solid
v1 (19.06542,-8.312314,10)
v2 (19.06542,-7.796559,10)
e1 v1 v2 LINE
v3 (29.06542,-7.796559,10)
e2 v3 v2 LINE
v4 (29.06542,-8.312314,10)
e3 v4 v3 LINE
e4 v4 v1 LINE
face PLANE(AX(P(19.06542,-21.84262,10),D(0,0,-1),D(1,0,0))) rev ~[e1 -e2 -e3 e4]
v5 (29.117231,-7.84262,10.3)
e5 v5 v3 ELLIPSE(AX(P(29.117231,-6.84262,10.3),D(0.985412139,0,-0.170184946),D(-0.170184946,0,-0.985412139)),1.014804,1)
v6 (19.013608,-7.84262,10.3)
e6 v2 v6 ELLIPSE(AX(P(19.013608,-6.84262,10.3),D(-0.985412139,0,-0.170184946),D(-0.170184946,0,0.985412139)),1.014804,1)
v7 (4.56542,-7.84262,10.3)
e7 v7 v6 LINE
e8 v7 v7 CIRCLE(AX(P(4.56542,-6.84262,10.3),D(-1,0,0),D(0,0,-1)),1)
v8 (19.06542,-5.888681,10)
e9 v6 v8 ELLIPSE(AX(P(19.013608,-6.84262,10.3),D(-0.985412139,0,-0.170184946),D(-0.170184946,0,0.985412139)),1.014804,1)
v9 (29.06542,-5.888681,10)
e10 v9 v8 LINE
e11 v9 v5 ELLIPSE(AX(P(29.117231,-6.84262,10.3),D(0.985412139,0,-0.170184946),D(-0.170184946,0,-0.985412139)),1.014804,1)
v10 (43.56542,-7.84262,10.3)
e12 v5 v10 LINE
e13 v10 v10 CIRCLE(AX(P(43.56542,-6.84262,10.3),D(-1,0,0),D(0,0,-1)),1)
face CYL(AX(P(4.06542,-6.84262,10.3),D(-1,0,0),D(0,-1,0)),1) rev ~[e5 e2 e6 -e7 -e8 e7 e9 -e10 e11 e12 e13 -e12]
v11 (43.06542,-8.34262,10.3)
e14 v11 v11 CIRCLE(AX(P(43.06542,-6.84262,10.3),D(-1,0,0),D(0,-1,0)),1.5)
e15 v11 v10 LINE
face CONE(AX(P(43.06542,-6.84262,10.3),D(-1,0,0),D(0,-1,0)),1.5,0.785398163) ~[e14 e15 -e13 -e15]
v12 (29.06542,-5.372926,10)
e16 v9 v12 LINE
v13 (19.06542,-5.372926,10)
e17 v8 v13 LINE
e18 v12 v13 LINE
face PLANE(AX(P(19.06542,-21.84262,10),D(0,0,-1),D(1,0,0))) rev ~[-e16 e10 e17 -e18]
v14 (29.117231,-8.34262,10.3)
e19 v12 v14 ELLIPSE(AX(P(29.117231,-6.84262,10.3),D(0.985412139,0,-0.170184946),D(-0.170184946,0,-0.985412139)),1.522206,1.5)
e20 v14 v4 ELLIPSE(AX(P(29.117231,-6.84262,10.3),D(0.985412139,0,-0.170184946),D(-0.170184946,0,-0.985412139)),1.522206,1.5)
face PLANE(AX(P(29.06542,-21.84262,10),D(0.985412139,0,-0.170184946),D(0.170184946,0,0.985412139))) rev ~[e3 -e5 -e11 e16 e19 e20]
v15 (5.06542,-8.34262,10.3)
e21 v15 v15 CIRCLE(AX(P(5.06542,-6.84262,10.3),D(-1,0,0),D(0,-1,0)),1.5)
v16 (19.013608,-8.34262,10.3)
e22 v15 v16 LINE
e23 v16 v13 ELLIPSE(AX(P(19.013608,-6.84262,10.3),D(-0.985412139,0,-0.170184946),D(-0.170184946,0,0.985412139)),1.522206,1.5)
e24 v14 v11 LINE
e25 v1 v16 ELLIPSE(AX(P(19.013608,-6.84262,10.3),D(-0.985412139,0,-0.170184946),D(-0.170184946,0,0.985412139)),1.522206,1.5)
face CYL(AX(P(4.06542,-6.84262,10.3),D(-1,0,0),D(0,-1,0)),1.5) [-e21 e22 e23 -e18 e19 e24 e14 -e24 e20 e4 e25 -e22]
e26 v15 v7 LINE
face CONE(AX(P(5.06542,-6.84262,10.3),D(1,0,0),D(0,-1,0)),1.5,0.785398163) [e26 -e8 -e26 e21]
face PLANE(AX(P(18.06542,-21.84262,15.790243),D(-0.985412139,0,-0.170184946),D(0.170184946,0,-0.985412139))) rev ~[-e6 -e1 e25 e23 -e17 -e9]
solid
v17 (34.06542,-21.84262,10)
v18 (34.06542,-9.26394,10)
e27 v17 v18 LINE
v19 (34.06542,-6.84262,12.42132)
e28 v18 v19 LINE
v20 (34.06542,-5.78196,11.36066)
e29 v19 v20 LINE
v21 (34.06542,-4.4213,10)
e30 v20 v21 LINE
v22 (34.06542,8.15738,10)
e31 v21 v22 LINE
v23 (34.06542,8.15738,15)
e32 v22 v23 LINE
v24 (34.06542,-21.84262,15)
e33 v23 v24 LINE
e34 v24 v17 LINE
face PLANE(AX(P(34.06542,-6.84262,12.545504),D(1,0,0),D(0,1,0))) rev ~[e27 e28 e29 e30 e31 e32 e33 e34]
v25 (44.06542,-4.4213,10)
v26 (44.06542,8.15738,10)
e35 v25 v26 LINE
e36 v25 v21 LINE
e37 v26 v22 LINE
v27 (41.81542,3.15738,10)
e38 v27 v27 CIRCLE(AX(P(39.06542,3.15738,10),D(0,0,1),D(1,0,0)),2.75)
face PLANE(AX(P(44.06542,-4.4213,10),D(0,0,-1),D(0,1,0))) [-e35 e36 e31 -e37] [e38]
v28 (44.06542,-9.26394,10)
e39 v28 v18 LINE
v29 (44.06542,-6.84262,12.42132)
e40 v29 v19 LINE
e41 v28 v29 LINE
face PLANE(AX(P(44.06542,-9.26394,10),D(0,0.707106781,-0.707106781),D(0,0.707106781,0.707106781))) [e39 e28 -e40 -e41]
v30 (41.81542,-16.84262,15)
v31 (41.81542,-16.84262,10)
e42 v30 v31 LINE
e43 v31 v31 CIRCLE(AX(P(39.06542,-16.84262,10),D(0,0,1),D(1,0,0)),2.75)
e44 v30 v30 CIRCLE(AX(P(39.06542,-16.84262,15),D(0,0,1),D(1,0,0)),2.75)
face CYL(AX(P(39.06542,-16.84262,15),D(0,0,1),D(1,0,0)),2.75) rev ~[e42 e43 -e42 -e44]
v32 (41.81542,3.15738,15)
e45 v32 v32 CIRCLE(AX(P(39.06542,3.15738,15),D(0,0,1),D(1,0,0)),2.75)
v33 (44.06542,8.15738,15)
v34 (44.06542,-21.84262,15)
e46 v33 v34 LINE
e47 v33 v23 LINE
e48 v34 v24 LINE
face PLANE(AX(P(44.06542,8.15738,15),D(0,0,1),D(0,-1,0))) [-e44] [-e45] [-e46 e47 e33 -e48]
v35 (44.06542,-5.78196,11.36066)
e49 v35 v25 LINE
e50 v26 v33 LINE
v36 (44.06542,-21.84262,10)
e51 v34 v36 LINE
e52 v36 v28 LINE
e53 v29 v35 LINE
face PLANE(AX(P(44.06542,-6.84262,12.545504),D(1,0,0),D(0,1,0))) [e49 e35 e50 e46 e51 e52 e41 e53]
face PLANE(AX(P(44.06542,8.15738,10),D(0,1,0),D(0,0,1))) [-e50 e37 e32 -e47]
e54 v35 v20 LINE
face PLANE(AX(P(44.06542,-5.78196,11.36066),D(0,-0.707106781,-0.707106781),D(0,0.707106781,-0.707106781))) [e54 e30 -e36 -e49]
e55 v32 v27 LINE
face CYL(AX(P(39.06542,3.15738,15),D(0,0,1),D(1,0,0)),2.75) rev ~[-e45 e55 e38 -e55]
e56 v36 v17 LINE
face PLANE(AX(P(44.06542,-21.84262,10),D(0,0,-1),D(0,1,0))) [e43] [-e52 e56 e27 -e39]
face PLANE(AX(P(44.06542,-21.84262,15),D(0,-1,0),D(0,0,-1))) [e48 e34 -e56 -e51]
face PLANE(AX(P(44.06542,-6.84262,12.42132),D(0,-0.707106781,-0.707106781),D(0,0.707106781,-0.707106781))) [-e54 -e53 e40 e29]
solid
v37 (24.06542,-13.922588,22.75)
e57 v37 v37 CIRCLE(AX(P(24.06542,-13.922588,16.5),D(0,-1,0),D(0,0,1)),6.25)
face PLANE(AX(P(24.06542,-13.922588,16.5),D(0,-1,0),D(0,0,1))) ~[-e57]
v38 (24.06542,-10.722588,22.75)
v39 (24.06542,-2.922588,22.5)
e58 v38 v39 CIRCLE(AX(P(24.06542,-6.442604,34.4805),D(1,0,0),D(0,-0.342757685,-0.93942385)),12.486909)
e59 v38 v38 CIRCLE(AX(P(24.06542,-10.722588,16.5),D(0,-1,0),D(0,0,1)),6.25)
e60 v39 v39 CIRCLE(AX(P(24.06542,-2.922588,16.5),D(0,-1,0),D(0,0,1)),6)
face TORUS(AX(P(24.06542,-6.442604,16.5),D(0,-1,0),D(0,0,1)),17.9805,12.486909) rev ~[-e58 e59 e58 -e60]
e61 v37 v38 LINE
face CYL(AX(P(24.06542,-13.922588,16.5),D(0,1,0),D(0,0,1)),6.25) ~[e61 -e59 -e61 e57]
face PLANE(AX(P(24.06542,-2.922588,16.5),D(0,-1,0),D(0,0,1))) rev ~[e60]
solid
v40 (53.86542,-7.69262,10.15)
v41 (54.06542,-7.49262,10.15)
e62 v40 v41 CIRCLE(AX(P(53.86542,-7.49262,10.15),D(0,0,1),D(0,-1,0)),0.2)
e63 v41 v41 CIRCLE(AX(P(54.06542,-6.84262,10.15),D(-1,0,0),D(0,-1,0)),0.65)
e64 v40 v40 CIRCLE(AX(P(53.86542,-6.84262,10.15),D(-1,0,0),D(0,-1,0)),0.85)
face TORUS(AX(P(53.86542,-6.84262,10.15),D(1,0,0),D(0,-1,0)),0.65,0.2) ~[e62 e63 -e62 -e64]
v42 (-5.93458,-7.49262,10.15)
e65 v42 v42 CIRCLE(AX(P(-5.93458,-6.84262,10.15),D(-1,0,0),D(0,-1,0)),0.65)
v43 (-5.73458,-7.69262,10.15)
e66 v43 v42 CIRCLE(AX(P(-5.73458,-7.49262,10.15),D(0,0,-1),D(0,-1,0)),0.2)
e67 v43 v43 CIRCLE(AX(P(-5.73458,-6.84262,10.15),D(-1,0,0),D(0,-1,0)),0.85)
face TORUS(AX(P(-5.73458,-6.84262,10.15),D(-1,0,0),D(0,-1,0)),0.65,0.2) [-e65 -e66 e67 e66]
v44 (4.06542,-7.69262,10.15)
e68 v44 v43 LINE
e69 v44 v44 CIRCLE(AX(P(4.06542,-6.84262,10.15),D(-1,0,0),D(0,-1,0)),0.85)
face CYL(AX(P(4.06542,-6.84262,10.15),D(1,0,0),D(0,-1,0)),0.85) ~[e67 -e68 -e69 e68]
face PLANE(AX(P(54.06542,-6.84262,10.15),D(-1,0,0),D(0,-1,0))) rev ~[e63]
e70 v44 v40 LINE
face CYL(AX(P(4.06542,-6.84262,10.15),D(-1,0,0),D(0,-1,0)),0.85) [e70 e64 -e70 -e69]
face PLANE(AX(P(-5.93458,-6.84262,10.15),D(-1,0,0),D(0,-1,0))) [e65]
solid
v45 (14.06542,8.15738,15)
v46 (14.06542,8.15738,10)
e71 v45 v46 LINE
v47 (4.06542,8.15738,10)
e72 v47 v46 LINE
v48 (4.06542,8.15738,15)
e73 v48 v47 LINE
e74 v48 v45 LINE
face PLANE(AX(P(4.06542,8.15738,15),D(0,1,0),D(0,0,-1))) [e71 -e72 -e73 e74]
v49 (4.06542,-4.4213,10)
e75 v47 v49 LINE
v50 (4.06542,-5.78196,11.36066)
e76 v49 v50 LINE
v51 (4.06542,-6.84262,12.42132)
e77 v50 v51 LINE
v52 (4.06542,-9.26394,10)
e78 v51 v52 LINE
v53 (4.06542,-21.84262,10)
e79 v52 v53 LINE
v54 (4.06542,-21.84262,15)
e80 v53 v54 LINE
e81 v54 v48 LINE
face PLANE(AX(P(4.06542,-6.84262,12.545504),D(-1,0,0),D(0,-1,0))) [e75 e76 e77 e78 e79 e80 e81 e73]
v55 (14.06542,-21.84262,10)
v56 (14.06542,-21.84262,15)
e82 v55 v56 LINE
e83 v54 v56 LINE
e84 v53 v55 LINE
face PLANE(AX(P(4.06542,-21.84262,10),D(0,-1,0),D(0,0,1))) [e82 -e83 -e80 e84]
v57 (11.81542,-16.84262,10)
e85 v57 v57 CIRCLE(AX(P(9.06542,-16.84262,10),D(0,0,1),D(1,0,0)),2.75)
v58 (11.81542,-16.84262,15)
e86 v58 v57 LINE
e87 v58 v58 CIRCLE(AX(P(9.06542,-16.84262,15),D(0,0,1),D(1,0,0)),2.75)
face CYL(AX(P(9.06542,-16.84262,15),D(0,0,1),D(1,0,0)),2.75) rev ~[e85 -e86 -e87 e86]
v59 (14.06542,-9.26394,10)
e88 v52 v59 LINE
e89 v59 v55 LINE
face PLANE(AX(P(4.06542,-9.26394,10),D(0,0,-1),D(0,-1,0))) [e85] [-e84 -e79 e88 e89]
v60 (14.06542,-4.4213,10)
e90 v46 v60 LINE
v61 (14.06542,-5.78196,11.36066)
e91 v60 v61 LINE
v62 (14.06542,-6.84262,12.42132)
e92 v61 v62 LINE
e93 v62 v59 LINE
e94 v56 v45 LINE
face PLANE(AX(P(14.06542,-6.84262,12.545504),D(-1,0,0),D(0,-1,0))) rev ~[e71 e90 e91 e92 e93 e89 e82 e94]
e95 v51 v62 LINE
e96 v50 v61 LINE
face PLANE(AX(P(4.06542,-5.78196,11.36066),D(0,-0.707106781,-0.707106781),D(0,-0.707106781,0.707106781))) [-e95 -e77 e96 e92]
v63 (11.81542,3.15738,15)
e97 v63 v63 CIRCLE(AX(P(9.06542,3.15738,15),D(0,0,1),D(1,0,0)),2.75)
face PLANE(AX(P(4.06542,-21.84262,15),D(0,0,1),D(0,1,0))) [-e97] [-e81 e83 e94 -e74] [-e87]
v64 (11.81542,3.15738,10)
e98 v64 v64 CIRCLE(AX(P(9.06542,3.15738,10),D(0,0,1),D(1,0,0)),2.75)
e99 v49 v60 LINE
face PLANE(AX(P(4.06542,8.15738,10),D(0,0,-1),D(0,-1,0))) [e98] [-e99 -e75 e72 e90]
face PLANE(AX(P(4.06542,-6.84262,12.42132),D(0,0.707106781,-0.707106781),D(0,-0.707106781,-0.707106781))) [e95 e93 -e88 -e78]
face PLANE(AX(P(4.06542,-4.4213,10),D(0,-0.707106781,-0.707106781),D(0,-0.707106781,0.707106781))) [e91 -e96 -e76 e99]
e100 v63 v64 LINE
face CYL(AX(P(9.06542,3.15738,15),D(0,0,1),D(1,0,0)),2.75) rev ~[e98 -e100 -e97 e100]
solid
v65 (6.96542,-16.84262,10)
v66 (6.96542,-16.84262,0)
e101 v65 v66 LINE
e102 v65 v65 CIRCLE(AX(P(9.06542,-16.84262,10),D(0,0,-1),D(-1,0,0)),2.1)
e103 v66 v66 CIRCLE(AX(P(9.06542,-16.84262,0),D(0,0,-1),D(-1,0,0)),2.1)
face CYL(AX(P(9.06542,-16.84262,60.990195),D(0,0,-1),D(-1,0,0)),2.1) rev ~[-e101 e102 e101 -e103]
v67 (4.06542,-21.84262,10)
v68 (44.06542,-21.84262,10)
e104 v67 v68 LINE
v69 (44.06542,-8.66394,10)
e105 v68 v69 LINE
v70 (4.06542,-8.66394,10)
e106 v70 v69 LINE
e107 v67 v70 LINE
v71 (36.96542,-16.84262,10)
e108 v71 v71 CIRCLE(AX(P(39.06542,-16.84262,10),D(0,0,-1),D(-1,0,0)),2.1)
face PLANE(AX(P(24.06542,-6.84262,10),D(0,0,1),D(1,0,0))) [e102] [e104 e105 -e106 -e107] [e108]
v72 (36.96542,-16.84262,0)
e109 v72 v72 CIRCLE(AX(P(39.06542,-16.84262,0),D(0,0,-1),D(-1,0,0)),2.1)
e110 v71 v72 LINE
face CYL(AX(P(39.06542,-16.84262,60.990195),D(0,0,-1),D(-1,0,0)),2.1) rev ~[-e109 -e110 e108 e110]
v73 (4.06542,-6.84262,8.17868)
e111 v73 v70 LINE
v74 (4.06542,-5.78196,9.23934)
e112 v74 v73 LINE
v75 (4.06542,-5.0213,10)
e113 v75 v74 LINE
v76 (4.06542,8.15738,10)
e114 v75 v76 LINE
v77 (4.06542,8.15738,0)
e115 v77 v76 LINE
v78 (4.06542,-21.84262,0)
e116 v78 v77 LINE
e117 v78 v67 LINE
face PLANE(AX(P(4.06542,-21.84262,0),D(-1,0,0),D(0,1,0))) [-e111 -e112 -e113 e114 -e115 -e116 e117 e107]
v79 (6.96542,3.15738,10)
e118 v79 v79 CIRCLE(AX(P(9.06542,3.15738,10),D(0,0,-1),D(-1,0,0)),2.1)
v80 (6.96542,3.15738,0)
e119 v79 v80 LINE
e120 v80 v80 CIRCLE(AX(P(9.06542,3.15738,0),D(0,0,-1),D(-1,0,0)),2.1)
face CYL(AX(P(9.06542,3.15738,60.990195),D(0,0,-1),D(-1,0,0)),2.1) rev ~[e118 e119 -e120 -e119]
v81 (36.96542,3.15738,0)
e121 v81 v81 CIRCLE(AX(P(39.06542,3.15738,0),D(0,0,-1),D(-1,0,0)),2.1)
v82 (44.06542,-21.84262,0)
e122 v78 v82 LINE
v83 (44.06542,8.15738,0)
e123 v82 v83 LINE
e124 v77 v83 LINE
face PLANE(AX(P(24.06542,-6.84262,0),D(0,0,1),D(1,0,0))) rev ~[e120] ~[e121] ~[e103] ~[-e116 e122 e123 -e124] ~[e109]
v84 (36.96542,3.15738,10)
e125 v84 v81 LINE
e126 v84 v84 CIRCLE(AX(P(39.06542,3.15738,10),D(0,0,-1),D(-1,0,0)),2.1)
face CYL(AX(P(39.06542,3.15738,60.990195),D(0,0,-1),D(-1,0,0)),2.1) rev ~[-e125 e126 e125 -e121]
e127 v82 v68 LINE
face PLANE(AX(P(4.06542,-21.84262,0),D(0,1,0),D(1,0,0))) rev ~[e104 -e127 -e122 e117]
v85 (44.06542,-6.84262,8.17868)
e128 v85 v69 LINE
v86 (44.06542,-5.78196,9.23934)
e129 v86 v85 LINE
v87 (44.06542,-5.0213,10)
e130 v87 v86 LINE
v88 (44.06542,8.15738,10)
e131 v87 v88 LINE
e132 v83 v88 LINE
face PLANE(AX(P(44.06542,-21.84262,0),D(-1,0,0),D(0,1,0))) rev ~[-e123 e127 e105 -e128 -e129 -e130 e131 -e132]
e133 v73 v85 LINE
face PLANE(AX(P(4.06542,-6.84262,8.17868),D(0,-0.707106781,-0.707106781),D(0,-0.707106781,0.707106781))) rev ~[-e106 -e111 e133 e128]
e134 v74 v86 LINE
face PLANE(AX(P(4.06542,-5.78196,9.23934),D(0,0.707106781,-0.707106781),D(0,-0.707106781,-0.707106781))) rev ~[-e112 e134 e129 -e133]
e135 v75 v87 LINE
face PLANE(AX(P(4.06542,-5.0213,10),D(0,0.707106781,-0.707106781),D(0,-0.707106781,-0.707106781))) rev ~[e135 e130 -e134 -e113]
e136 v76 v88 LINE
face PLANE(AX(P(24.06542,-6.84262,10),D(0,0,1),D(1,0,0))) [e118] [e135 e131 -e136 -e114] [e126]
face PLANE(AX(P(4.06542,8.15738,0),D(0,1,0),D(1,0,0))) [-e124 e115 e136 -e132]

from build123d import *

# Parameters (mm, degrees)
F0_W      = 40
F0_H      = 30
F1_DEPTH  = 10
F4_DEPTH  = 40
F5_D      = 4.2
F7_DEPTH  = 10
F9_DEPTH  = 10
F10_R     = 2.75
F11_DEPTH = 5
F12_R     = 2.75
F13_DEPTH = 5
F15_R     = 1.5
F15_R_2   = 1
F16_DEPTH = 40
F17_W     = 10
F17_H     = 5.7902427018
F18_DEPTH = 25
F20_R     = 0.85
F21_DEPTH = 50
F22_DEPTH = 10
F26_R     = 0.2


# Not quite as in the source:
# - a fillet or chamfer that OpenCascade refuses, or shapes differently, is made with other operations: its cross-section is extruded or revolved along the edge and cut away or added


with BuildPart() as f1:
    # F0 (on Top) → F1 (new body)
    with BuildSketch(Plane.XY):
        with Locations((24.0654195845, -6.8426200747)):
            Rectangle(F0_W, F0_H)
    extrude(amount=F1_DEPTH)

    # F3 (on face) → F4 (cut, through all)
    with BuildSketch(Plane(origin=(4.0654195845, 0, 0), x_dir=(0, -1, 0), z_dir=(-1, 0, 0))):
        with BuildLine():
            ThreePointArc((7.9032802465, 9.2393398282), (6.8426200747, 8.8), (5.781959903, 9.2393398282))
            Line((5.781959903, 9.2393398282), (6.8426200747, 8.1786796564))
            Line((6.8426200747, 8.1786796564), (7.9032802465, 9.2393398282))
        make_face()
        with BuildLine():
            ThreePointArc((5.3729262291, 10), (5.5215130247, 9.5895943677), (5.781959903, 9.2393398282))
            ThreePointArc((5.781959903, 9.2393398282), (6.8426200747, 8.8), (7.9032802465, 9.2393398282))
            ThreePointArc((7.9032802465, 9.2393398282), (8.1637271248, 9.5895943677), (8.3123139204, 10))
            Line((8.3123139204, 10), (6.8426200747, 10))
            Line((6.8426200747, 10), (5.3729262291, 10))
        make_face()
        with BuildLine():
            Line((5.3729262291, 10), (5.0212997312, 10))
            Line((5.0212997312, 10), (5.781959903, 9.2393398282))
            ThreePointArc((5.781959903, 9.2393398282), (5.5215130247, 9.5895943677), (5.3729262291, 10))
        make_face()
        with BuildLine():
            ThreePointArc((8.3123139204, 10), (8.1637271248, 9.5895943677), (7.9032802465, 9.2393398282))
            Line((7.9032802465, 9.2393398282), (8.6639404183, 10))
            Line((8.6639404183, 10), (8.3123139204, 10))
        make_face()
    extrude(amount=-F4_DEPTH, mode=Mode.SUBTRACT)

    # F5 (through all)
    with Locations(Plane.XY.offset(10)):
        with Locations((9.0654195845, 3.1573799253), (39.0654195845, 3.1573799253), (39.0654195845, -16.8426200747), (9.0654195845, -16.8426200747)):
            Hole(F5_D / 2)


with BuildPart() as f7:
    # F6 (on face) → F7 (new body)
    with BuildSketch(Plane(origin=(4.0654195845, 0, 0), x_dir=(0, -1, 0), z_dir=(-1, 0, 0))):
        Polygon((-8.1573799253, 15), (-8.1573799253, 10), (4.4212997312, 10), (5.781959903, 11.3606601718), (6.8426200747, 12.4213203436), (7.9032802476, 11.3606601707), (9.2639404183, 10), (21.8426200747, 10), (21.8426200747, 15), align=None)
    extrude(amount=-F7_DEPTH)

    # F10 (on face) → F11 (cut, through all)
    with BuildSketch(Plane.XY.offset(15)):
        with Locations((9.0654195845, 3.1573799253)):
            Circle(F10_R)
        with Locations((9.0654195845, -16.8426200747)):
            Circle(F10_R)
    extrude(amount=-F11_DEPTH, mode=Mode.SUBTRACT)


with BuildPart() as f9:
    # F8 (on face) → F9 (new body)
    with BuildSketch(Plane.YZ.offset(44.0654195845)):
        Polygon((-6.8426200747, 12.4213203436), (-5.781959903, 11.3606601718), (-4.4212997312, 10), (8.1573799253, 10), (8.1573799253, 15), (-21.8426200747, 15), (-21.8426200747, 10), (-9.2639404183, 10), (-7.9032802476, 11.3606601707), align=None)
    extrude(amount=-F9_DEPTH)

    # F12 (on face) → F13 (cut, through all)
    with BuildSketch(Plane.XY.offset(15)):
        with Locations((39.0654195845, 3.1573799253)):
            Circle(F12_R)
        with Locations((39.0654195845, -16.8426200747)):
            Circle(F12_R)
    extrude(amount=-F13_DEPTH, mode=Mode.SUBTRACT)


with BuildPart() as f16:
    # F15 (on offset) → F16 (new body)
    with BuildSketch(Plane(origin=(4.0654195845, 0, 0), x_dir=(0, -1, 0), z_dir=(-1, 0, 0))):
        with Locations((6.8426200747, 10.3)):
            Circle(F15_R)
        with Locations((6.8426200747, 10.3)):
            Circle(F15_R_2, mode=Mode.SUBTRACT)
    extrude(amount=-F16_DEPTH)

    # F17 (on face) → F18 (cut)
    with BuildSketch(Plane.XZ.offset(21.8426200747)):
        with Locations((24.0654195845, 12.8951213509)):
            Rectangle(F17_W, F17_H)
        Polygon((19.0654195845, 10), (19.0654195845, 15.7902427018), (18.0654195845, 15.7902427018), align=None)
        Polygon((30.0654195845, 15.7902427018), (29.0654195845, 15.7902427018), (29.0654195845, 10), align=None)
    extrude(amount=-F18_DEPTH, mode=Mode.SUBTRACT)

    # F19: chamfer of 1 on 2 edges, made by hand

    # F19_s1 → F19_t2 (revolve, cut)
    with BuildSketch(Plane.XY.offset(10.3)):
        Polygon((5.0654195845, -8.3426200747), (4.0654195845, -7.3426200747), (4.0654195845, -8.3426200747), align=None)
    revolve(axis=Axis((4.0654195845, -6.8426200747, 10.3), (-1, 0, 0)), mode=Mode.SUBTRACT)

    # F19_s3 → F19_t4 (revolve, cut)
    with BuildSketch(Plane.XY.offset(10.3)):
        Polygon((43.0654195845, -8.3426200747), (44.0654195845, -7.3426200747), (44.0654195845, -8.3426200747), align=None)
    revolve(axis=Axis((44.0654195845, -6.8426200747, 10.3), (-1, 0, 0)), mode=Mode.SUBTRACT)


with BuildPart() as f21:
    # F20 (on offset) → F21 (new body)
    with BuildSketch(Plane(origin=(4.0654195845, 0, 0), x_dir=(0, -1, 0), z_dir=(-1, 0, 0))):
        with Locations((6.8426200747, 10.15)):
            Circle(F20_R)
    extrude(amount=-F21_DEPTH)

    # F22 (add): a face of the model
    f22_faces = [f21.faces().sort_by_distance(p)[0] for p in [
        (4.0654195845, -6.8426200747, 10.15),
    ]]
    extrude(f22_faces, amount=F22_DEPTH)

    # F26
    f26_edges = [f21.edges().sort_by_distance(p)[0] for p in [
        (-5.93458, -5.99262, 10.15),
        (54.06542, -5.99262, 10.15),
    ]]
    fillet(f26_edges, radius=F26_R)


with BuildPart() as f25:
    # F24 (on offset) → F25 (revolve)
    with BuildSketch(Plane(origin=(24.0654195845, 0, 0), x_dir=(0, -1, 0), z_dir=(-1, 0, 0))):
        with BuildLine():
            Line((13.9225880235, 16.5), (13.9225880235, 22.75))
            Line((13.9225880235, 22.75), (10.7225880235, 22.75))
            ThreePointArc((10.7225880235, 22.75), (6.8426200747, 22), (2.9225880235, 22.5))
            Line((2.9225880235, 22.5), (2.9225880235, 21.7202004913))
            Line((2.9225880235, 21.7202004913), (2.9225880235, 16.5))
            Line((2.9225880235, 16.5), (13.9225880235, 16.5))
        make_face()
    revolve(axis=Axis((24.0654195845, -8.4225880235, 16.5), (0, -1, 0)))


solid = Compound([f1.part, f7.part, f9.part, f16.part, f21.part, f25.part])
